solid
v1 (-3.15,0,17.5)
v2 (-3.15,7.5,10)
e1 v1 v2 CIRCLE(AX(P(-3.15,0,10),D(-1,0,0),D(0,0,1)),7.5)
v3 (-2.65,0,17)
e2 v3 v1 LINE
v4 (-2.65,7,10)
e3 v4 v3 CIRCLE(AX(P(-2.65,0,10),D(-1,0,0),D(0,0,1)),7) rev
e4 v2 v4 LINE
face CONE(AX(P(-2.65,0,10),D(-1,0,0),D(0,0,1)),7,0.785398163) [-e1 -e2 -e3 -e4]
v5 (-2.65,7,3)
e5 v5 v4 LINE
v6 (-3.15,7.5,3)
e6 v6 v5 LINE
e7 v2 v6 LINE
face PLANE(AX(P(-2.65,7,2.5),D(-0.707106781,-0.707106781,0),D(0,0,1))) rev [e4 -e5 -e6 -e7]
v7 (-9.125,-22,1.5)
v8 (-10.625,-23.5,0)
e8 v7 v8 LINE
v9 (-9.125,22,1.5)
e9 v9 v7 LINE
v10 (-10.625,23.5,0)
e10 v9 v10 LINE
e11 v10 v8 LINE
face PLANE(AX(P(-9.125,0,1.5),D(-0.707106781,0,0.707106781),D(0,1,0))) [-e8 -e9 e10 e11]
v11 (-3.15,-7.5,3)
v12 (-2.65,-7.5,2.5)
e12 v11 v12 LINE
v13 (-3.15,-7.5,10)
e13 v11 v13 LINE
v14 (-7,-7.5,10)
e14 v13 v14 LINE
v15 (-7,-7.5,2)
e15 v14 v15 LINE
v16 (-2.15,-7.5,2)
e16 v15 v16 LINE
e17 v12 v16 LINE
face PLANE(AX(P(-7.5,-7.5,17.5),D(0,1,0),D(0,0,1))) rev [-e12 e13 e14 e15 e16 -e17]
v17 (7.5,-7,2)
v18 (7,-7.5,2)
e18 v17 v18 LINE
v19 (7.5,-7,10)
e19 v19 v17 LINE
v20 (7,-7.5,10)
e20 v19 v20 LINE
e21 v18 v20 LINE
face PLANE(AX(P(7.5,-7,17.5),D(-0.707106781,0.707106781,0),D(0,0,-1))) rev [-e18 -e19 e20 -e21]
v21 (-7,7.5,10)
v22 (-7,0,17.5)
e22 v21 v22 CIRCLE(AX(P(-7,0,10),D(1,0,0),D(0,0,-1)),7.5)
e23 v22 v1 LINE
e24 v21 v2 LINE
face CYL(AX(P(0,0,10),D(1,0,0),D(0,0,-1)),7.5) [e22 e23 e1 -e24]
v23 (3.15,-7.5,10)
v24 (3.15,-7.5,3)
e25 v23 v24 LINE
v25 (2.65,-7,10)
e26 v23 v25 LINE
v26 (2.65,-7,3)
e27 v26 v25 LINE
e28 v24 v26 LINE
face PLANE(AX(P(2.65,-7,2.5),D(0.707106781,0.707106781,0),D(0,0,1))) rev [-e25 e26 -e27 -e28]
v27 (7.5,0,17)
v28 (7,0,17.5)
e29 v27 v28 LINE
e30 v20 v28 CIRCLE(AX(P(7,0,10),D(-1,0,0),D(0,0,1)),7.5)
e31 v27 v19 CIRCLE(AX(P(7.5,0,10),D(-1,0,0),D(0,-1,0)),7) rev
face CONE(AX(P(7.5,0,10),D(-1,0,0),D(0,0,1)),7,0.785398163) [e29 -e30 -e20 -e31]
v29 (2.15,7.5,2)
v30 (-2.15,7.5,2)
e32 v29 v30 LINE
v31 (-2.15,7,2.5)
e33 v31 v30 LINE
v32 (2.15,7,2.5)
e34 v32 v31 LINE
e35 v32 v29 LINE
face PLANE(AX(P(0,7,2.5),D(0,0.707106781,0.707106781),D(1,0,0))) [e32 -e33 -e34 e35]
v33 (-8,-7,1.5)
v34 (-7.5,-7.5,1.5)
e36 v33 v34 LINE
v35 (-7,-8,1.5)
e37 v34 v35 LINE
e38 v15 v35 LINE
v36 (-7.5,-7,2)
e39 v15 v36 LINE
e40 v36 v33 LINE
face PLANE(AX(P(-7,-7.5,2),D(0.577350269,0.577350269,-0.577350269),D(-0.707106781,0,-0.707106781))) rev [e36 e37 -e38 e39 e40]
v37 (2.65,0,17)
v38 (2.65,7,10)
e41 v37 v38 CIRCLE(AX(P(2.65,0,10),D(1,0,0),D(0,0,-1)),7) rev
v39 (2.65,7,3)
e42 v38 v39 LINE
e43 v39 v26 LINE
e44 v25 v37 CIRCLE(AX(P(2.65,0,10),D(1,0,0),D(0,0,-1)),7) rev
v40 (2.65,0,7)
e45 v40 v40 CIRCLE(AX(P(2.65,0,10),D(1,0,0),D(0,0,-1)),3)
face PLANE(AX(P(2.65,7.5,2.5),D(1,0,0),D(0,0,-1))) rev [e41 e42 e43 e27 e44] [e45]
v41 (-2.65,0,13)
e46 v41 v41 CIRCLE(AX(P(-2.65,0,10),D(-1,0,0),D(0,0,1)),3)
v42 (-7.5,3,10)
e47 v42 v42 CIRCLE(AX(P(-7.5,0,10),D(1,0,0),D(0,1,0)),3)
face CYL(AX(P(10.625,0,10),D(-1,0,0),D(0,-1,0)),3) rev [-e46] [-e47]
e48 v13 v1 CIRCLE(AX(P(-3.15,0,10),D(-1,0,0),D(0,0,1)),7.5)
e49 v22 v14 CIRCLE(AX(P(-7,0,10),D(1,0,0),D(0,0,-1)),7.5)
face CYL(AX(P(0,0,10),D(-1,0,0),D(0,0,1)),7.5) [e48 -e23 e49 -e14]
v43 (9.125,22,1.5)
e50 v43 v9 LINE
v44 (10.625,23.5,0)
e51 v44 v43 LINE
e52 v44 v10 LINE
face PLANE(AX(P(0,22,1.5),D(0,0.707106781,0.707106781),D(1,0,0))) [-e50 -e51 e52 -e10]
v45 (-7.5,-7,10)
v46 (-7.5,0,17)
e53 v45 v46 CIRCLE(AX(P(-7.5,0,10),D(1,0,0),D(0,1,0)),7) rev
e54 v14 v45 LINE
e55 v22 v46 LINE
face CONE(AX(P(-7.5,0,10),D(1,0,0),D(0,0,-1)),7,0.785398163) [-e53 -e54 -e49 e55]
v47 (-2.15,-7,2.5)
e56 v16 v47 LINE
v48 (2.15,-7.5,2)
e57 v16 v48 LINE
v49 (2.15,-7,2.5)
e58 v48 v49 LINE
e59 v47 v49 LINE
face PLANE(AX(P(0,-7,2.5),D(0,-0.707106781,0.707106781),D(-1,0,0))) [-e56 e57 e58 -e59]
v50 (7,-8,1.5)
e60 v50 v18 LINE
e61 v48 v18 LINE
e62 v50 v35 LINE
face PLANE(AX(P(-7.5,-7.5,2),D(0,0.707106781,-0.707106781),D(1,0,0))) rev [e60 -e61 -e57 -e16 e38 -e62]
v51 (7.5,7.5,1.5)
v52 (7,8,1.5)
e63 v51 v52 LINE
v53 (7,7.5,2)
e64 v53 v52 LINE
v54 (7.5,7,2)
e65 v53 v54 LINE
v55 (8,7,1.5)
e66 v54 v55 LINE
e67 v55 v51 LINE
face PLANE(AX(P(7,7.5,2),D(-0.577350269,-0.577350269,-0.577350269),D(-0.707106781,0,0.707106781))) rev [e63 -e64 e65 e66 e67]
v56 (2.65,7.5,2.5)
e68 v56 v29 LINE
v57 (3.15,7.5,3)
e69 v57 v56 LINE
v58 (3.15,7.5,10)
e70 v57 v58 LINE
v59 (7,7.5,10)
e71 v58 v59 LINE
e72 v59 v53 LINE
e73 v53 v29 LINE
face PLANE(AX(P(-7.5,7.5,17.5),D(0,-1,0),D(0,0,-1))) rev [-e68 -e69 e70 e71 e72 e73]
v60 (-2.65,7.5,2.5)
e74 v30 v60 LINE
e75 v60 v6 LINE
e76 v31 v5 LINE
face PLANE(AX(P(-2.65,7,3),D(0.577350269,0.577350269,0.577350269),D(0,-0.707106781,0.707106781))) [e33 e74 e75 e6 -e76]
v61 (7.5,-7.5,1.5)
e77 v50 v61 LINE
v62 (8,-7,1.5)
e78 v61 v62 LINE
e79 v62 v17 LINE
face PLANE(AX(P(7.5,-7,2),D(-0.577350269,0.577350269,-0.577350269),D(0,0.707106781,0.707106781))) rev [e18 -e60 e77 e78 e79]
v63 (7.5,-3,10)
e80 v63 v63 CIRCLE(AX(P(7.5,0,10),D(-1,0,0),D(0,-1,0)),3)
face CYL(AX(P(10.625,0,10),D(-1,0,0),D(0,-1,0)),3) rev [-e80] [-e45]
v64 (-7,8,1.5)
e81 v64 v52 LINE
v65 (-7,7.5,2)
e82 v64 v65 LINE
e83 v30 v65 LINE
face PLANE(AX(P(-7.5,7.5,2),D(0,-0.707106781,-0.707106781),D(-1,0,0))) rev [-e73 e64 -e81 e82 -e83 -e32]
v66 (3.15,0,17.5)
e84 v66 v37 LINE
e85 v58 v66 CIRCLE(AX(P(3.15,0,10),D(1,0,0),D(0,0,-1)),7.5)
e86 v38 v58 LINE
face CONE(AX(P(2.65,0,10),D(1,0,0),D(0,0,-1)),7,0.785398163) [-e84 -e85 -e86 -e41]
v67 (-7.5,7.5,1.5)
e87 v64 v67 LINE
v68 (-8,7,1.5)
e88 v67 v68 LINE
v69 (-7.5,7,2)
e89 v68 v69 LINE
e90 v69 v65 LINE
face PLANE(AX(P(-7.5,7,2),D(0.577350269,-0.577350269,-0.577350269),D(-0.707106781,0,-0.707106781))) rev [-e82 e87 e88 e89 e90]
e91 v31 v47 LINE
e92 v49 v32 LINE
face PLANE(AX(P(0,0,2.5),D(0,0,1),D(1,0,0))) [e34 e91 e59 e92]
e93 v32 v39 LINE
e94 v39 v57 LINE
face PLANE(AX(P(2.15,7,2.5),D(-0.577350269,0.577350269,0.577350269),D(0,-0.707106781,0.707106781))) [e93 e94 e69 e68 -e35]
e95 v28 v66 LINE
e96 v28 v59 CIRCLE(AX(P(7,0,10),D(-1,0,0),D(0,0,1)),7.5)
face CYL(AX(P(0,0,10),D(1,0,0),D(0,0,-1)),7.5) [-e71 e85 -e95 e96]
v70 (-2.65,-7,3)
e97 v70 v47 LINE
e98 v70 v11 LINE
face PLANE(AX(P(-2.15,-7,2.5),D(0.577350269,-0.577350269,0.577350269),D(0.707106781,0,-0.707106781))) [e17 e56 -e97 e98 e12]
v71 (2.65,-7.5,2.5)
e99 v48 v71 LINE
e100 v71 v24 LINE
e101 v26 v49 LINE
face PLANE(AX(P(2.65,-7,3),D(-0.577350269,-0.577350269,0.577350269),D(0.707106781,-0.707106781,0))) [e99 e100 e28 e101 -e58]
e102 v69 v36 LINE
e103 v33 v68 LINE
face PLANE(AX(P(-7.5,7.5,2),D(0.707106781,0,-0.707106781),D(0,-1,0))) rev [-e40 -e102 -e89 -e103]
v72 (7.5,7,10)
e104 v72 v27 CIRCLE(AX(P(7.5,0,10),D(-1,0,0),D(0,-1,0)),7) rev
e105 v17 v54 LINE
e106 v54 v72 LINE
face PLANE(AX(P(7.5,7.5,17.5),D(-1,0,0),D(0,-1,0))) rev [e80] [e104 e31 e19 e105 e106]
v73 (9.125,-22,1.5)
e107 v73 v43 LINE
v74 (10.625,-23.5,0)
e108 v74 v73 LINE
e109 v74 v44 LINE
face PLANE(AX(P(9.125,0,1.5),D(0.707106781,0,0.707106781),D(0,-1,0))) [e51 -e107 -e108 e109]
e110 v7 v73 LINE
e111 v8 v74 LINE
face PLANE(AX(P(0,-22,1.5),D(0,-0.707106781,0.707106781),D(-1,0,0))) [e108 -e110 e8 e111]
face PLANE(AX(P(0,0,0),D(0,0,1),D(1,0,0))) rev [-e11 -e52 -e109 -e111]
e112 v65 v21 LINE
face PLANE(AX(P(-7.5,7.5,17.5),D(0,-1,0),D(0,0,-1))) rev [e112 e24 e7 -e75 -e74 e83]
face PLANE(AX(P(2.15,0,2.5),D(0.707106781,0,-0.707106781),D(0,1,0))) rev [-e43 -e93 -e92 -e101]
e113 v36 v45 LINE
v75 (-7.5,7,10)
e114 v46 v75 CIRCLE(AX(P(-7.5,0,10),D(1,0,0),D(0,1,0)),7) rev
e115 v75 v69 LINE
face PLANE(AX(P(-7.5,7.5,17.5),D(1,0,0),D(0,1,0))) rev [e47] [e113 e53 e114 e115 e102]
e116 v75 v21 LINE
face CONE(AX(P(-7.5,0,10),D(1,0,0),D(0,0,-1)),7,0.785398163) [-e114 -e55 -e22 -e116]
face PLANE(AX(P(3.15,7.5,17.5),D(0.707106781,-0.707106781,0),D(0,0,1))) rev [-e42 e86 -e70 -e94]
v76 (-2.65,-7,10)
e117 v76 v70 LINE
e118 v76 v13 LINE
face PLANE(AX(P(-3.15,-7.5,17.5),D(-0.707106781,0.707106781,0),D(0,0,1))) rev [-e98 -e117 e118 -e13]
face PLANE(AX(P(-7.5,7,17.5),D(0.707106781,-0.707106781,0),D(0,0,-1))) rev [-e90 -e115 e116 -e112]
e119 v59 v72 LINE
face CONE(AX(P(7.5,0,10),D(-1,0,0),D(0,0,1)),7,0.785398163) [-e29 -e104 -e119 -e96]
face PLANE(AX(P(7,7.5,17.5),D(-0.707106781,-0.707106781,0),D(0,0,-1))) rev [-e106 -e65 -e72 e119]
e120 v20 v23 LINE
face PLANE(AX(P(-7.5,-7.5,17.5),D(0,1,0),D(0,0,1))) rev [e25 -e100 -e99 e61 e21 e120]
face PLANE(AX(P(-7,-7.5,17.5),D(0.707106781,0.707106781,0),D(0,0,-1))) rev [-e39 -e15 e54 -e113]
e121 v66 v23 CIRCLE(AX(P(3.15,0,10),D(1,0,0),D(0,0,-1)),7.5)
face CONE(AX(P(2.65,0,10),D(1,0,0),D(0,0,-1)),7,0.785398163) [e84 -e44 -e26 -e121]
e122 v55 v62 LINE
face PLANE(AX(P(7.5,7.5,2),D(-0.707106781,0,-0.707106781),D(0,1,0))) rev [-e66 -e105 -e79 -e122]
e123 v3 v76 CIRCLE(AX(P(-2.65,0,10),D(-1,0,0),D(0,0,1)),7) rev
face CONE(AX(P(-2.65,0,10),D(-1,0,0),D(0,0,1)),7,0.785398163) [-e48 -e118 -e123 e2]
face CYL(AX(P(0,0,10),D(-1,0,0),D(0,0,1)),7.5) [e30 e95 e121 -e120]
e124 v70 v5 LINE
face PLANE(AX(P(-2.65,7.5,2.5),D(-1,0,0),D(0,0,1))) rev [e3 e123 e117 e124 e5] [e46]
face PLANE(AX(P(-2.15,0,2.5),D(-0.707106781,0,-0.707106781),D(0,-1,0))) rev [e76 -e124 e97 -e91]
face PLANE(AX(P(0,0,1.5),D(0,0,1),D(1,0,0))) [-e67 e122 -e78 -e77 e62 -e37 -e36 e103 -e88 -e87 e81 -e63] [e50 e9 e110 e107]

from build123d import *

# Parameters (mm, degrees)
SKETCH1_W               = 21.25
SKETCH1_H               = 47
BOSS_EXTRUDE1_DEPTH     = 1.5
CHAMFER1_SIZE           = 1.5
SKETCH2_W               = 15
SKETCH2_H               = 15
BOSS_EXTRUDE2_DEPTH     = 16
SKETCH3_W               = 5.3
SKETCH3_H               = 15
CUT_EXTRUDE1_DEPTH      = 15
CUT_EXTRUDE2_DEPTH      = 35.453093112
CUT_EXTRUDE2_DEPTH_BACK = 35.453093112
SKETCH4_R               = 3
FILLET1_R               = 7.5
CHAMFER2_SIZE           = 0.5


with BuildPart() as part:
    # Sketch1 → Boss-Extrude1 (new body)
    with BuildSketch(Plane.XY):
        Rectangle(SKETCH1_W, SKETCH1_H)
    extrude(amount=BOSS_EXTRUDE1_DEPTH)

    # Chamfer1
    chamfer1_edges = [part.edges().sort_by_distance(p)[0] for p in [
        (0, -23.5, 1.5),
        (-10.625, 0, 1.5),
        (0, 23.5, 1.5),
        (10.625, 0, 1.5),
    ]]
    chamfer(chamfer1_edges, length=CHAMFER1_SIZE - 0.0001)  # a hair under: the kernel refuses the full size

    # Sketch2 → Boss-Extrude2 (add)
    with BuildSketch(Plane.XY.offset(1.5)):
        Rectangle(SKETCH2_W, SKETCH2_H)
    extrude(amount=BOSS_EXTRUDE2_DEPTH)

    # Sketch3 → Cut-Extrude1 (cut)
    with BuildSketch(Plane.XY.offset(17.5)):
        Rectangle(SKETCH3_W, SKETCH3_H)
    extrude(amount=-CUT_EXTRUDE1_DEPTH, mode=Mode.SUBTRACT)

    # Sketch4 → Cut-Extrude2 (cut, two sides: drawn at the far end of the back side and taken through both)
    with BuildSketch(Plane.ZY.offset(7.5).offset(-CUT_EXTRUDE2_DEPTH_BACK)):
        with Locations((10, 0)):
            Circle(SKETCH4_R)
    extrude(amount=CUT_EXTRUDE2_DEPTH + CUT_EXTRUDE2_DEPTH_BACK, mode=Mode.SUBTRACT)

    # Fillet1
    fillet1_edges = [part.edges().sort_by_distance(p)[0] for p in [
        (5.075, -7.5, 17.5),
        (5.075, 7.5, 17.5),
        (-5.075, 7.5, 17.5),
        (-5.075, -7.5, 17.5),
    ]]
    fillet(fillet1_edges, radius=FILLET1_R - 0.0001)  # a hair under: the kernel refuses the full size

    # Chamfer2
    chamfer2_edges = [part.edges().sort_by_distance(p)[0] for p in [
        (7.5, 0, 1.5),
        (0, 7.5, 1.5),
        (-7.5, 0, 1.5),
        (0, -7.5, 1.5),
        (2.65, 0, 2.5),
        (2.65, 7.5, 6.25005),
        (0, -7.5, 2.5),
        (2.65, -7.5, 6.25005),
        (-2.65, 0, 2.5),
        (-2.65, -7.5, 6.25005),
        (0, 7.5, 2.5),
        (-2.65, 7.5, 6.25005),
        (7.5, 7.5, 5.75005),
        (7.5, -7.5, 5.75005),
        (7.5, 5.303330148, 15.303330148),
        (7.5, -5.303330148, 15.303330148),
        (-7.5, -7.5, 5.75005),
        (2.65, 5.303330148, 15.303330148),
        (2.65, -5.303330148, 15.303330148),
        (-7.5, 7.5, 5.75005),
        (-7.5, -5.303330148, 15.303330148),
        (-7.5, 5.303330148, 15.303330148),
        (-2.65, -5.303330148, 15.303330148),
        (-2.65, 5.303330148, 15.303330148),
    ]]
    chamfer(chamfer2_edges, length=CHAMFER2_SIZE - 0.0001)  # a hair under: the kernel refuses the full size


solid = part.part
